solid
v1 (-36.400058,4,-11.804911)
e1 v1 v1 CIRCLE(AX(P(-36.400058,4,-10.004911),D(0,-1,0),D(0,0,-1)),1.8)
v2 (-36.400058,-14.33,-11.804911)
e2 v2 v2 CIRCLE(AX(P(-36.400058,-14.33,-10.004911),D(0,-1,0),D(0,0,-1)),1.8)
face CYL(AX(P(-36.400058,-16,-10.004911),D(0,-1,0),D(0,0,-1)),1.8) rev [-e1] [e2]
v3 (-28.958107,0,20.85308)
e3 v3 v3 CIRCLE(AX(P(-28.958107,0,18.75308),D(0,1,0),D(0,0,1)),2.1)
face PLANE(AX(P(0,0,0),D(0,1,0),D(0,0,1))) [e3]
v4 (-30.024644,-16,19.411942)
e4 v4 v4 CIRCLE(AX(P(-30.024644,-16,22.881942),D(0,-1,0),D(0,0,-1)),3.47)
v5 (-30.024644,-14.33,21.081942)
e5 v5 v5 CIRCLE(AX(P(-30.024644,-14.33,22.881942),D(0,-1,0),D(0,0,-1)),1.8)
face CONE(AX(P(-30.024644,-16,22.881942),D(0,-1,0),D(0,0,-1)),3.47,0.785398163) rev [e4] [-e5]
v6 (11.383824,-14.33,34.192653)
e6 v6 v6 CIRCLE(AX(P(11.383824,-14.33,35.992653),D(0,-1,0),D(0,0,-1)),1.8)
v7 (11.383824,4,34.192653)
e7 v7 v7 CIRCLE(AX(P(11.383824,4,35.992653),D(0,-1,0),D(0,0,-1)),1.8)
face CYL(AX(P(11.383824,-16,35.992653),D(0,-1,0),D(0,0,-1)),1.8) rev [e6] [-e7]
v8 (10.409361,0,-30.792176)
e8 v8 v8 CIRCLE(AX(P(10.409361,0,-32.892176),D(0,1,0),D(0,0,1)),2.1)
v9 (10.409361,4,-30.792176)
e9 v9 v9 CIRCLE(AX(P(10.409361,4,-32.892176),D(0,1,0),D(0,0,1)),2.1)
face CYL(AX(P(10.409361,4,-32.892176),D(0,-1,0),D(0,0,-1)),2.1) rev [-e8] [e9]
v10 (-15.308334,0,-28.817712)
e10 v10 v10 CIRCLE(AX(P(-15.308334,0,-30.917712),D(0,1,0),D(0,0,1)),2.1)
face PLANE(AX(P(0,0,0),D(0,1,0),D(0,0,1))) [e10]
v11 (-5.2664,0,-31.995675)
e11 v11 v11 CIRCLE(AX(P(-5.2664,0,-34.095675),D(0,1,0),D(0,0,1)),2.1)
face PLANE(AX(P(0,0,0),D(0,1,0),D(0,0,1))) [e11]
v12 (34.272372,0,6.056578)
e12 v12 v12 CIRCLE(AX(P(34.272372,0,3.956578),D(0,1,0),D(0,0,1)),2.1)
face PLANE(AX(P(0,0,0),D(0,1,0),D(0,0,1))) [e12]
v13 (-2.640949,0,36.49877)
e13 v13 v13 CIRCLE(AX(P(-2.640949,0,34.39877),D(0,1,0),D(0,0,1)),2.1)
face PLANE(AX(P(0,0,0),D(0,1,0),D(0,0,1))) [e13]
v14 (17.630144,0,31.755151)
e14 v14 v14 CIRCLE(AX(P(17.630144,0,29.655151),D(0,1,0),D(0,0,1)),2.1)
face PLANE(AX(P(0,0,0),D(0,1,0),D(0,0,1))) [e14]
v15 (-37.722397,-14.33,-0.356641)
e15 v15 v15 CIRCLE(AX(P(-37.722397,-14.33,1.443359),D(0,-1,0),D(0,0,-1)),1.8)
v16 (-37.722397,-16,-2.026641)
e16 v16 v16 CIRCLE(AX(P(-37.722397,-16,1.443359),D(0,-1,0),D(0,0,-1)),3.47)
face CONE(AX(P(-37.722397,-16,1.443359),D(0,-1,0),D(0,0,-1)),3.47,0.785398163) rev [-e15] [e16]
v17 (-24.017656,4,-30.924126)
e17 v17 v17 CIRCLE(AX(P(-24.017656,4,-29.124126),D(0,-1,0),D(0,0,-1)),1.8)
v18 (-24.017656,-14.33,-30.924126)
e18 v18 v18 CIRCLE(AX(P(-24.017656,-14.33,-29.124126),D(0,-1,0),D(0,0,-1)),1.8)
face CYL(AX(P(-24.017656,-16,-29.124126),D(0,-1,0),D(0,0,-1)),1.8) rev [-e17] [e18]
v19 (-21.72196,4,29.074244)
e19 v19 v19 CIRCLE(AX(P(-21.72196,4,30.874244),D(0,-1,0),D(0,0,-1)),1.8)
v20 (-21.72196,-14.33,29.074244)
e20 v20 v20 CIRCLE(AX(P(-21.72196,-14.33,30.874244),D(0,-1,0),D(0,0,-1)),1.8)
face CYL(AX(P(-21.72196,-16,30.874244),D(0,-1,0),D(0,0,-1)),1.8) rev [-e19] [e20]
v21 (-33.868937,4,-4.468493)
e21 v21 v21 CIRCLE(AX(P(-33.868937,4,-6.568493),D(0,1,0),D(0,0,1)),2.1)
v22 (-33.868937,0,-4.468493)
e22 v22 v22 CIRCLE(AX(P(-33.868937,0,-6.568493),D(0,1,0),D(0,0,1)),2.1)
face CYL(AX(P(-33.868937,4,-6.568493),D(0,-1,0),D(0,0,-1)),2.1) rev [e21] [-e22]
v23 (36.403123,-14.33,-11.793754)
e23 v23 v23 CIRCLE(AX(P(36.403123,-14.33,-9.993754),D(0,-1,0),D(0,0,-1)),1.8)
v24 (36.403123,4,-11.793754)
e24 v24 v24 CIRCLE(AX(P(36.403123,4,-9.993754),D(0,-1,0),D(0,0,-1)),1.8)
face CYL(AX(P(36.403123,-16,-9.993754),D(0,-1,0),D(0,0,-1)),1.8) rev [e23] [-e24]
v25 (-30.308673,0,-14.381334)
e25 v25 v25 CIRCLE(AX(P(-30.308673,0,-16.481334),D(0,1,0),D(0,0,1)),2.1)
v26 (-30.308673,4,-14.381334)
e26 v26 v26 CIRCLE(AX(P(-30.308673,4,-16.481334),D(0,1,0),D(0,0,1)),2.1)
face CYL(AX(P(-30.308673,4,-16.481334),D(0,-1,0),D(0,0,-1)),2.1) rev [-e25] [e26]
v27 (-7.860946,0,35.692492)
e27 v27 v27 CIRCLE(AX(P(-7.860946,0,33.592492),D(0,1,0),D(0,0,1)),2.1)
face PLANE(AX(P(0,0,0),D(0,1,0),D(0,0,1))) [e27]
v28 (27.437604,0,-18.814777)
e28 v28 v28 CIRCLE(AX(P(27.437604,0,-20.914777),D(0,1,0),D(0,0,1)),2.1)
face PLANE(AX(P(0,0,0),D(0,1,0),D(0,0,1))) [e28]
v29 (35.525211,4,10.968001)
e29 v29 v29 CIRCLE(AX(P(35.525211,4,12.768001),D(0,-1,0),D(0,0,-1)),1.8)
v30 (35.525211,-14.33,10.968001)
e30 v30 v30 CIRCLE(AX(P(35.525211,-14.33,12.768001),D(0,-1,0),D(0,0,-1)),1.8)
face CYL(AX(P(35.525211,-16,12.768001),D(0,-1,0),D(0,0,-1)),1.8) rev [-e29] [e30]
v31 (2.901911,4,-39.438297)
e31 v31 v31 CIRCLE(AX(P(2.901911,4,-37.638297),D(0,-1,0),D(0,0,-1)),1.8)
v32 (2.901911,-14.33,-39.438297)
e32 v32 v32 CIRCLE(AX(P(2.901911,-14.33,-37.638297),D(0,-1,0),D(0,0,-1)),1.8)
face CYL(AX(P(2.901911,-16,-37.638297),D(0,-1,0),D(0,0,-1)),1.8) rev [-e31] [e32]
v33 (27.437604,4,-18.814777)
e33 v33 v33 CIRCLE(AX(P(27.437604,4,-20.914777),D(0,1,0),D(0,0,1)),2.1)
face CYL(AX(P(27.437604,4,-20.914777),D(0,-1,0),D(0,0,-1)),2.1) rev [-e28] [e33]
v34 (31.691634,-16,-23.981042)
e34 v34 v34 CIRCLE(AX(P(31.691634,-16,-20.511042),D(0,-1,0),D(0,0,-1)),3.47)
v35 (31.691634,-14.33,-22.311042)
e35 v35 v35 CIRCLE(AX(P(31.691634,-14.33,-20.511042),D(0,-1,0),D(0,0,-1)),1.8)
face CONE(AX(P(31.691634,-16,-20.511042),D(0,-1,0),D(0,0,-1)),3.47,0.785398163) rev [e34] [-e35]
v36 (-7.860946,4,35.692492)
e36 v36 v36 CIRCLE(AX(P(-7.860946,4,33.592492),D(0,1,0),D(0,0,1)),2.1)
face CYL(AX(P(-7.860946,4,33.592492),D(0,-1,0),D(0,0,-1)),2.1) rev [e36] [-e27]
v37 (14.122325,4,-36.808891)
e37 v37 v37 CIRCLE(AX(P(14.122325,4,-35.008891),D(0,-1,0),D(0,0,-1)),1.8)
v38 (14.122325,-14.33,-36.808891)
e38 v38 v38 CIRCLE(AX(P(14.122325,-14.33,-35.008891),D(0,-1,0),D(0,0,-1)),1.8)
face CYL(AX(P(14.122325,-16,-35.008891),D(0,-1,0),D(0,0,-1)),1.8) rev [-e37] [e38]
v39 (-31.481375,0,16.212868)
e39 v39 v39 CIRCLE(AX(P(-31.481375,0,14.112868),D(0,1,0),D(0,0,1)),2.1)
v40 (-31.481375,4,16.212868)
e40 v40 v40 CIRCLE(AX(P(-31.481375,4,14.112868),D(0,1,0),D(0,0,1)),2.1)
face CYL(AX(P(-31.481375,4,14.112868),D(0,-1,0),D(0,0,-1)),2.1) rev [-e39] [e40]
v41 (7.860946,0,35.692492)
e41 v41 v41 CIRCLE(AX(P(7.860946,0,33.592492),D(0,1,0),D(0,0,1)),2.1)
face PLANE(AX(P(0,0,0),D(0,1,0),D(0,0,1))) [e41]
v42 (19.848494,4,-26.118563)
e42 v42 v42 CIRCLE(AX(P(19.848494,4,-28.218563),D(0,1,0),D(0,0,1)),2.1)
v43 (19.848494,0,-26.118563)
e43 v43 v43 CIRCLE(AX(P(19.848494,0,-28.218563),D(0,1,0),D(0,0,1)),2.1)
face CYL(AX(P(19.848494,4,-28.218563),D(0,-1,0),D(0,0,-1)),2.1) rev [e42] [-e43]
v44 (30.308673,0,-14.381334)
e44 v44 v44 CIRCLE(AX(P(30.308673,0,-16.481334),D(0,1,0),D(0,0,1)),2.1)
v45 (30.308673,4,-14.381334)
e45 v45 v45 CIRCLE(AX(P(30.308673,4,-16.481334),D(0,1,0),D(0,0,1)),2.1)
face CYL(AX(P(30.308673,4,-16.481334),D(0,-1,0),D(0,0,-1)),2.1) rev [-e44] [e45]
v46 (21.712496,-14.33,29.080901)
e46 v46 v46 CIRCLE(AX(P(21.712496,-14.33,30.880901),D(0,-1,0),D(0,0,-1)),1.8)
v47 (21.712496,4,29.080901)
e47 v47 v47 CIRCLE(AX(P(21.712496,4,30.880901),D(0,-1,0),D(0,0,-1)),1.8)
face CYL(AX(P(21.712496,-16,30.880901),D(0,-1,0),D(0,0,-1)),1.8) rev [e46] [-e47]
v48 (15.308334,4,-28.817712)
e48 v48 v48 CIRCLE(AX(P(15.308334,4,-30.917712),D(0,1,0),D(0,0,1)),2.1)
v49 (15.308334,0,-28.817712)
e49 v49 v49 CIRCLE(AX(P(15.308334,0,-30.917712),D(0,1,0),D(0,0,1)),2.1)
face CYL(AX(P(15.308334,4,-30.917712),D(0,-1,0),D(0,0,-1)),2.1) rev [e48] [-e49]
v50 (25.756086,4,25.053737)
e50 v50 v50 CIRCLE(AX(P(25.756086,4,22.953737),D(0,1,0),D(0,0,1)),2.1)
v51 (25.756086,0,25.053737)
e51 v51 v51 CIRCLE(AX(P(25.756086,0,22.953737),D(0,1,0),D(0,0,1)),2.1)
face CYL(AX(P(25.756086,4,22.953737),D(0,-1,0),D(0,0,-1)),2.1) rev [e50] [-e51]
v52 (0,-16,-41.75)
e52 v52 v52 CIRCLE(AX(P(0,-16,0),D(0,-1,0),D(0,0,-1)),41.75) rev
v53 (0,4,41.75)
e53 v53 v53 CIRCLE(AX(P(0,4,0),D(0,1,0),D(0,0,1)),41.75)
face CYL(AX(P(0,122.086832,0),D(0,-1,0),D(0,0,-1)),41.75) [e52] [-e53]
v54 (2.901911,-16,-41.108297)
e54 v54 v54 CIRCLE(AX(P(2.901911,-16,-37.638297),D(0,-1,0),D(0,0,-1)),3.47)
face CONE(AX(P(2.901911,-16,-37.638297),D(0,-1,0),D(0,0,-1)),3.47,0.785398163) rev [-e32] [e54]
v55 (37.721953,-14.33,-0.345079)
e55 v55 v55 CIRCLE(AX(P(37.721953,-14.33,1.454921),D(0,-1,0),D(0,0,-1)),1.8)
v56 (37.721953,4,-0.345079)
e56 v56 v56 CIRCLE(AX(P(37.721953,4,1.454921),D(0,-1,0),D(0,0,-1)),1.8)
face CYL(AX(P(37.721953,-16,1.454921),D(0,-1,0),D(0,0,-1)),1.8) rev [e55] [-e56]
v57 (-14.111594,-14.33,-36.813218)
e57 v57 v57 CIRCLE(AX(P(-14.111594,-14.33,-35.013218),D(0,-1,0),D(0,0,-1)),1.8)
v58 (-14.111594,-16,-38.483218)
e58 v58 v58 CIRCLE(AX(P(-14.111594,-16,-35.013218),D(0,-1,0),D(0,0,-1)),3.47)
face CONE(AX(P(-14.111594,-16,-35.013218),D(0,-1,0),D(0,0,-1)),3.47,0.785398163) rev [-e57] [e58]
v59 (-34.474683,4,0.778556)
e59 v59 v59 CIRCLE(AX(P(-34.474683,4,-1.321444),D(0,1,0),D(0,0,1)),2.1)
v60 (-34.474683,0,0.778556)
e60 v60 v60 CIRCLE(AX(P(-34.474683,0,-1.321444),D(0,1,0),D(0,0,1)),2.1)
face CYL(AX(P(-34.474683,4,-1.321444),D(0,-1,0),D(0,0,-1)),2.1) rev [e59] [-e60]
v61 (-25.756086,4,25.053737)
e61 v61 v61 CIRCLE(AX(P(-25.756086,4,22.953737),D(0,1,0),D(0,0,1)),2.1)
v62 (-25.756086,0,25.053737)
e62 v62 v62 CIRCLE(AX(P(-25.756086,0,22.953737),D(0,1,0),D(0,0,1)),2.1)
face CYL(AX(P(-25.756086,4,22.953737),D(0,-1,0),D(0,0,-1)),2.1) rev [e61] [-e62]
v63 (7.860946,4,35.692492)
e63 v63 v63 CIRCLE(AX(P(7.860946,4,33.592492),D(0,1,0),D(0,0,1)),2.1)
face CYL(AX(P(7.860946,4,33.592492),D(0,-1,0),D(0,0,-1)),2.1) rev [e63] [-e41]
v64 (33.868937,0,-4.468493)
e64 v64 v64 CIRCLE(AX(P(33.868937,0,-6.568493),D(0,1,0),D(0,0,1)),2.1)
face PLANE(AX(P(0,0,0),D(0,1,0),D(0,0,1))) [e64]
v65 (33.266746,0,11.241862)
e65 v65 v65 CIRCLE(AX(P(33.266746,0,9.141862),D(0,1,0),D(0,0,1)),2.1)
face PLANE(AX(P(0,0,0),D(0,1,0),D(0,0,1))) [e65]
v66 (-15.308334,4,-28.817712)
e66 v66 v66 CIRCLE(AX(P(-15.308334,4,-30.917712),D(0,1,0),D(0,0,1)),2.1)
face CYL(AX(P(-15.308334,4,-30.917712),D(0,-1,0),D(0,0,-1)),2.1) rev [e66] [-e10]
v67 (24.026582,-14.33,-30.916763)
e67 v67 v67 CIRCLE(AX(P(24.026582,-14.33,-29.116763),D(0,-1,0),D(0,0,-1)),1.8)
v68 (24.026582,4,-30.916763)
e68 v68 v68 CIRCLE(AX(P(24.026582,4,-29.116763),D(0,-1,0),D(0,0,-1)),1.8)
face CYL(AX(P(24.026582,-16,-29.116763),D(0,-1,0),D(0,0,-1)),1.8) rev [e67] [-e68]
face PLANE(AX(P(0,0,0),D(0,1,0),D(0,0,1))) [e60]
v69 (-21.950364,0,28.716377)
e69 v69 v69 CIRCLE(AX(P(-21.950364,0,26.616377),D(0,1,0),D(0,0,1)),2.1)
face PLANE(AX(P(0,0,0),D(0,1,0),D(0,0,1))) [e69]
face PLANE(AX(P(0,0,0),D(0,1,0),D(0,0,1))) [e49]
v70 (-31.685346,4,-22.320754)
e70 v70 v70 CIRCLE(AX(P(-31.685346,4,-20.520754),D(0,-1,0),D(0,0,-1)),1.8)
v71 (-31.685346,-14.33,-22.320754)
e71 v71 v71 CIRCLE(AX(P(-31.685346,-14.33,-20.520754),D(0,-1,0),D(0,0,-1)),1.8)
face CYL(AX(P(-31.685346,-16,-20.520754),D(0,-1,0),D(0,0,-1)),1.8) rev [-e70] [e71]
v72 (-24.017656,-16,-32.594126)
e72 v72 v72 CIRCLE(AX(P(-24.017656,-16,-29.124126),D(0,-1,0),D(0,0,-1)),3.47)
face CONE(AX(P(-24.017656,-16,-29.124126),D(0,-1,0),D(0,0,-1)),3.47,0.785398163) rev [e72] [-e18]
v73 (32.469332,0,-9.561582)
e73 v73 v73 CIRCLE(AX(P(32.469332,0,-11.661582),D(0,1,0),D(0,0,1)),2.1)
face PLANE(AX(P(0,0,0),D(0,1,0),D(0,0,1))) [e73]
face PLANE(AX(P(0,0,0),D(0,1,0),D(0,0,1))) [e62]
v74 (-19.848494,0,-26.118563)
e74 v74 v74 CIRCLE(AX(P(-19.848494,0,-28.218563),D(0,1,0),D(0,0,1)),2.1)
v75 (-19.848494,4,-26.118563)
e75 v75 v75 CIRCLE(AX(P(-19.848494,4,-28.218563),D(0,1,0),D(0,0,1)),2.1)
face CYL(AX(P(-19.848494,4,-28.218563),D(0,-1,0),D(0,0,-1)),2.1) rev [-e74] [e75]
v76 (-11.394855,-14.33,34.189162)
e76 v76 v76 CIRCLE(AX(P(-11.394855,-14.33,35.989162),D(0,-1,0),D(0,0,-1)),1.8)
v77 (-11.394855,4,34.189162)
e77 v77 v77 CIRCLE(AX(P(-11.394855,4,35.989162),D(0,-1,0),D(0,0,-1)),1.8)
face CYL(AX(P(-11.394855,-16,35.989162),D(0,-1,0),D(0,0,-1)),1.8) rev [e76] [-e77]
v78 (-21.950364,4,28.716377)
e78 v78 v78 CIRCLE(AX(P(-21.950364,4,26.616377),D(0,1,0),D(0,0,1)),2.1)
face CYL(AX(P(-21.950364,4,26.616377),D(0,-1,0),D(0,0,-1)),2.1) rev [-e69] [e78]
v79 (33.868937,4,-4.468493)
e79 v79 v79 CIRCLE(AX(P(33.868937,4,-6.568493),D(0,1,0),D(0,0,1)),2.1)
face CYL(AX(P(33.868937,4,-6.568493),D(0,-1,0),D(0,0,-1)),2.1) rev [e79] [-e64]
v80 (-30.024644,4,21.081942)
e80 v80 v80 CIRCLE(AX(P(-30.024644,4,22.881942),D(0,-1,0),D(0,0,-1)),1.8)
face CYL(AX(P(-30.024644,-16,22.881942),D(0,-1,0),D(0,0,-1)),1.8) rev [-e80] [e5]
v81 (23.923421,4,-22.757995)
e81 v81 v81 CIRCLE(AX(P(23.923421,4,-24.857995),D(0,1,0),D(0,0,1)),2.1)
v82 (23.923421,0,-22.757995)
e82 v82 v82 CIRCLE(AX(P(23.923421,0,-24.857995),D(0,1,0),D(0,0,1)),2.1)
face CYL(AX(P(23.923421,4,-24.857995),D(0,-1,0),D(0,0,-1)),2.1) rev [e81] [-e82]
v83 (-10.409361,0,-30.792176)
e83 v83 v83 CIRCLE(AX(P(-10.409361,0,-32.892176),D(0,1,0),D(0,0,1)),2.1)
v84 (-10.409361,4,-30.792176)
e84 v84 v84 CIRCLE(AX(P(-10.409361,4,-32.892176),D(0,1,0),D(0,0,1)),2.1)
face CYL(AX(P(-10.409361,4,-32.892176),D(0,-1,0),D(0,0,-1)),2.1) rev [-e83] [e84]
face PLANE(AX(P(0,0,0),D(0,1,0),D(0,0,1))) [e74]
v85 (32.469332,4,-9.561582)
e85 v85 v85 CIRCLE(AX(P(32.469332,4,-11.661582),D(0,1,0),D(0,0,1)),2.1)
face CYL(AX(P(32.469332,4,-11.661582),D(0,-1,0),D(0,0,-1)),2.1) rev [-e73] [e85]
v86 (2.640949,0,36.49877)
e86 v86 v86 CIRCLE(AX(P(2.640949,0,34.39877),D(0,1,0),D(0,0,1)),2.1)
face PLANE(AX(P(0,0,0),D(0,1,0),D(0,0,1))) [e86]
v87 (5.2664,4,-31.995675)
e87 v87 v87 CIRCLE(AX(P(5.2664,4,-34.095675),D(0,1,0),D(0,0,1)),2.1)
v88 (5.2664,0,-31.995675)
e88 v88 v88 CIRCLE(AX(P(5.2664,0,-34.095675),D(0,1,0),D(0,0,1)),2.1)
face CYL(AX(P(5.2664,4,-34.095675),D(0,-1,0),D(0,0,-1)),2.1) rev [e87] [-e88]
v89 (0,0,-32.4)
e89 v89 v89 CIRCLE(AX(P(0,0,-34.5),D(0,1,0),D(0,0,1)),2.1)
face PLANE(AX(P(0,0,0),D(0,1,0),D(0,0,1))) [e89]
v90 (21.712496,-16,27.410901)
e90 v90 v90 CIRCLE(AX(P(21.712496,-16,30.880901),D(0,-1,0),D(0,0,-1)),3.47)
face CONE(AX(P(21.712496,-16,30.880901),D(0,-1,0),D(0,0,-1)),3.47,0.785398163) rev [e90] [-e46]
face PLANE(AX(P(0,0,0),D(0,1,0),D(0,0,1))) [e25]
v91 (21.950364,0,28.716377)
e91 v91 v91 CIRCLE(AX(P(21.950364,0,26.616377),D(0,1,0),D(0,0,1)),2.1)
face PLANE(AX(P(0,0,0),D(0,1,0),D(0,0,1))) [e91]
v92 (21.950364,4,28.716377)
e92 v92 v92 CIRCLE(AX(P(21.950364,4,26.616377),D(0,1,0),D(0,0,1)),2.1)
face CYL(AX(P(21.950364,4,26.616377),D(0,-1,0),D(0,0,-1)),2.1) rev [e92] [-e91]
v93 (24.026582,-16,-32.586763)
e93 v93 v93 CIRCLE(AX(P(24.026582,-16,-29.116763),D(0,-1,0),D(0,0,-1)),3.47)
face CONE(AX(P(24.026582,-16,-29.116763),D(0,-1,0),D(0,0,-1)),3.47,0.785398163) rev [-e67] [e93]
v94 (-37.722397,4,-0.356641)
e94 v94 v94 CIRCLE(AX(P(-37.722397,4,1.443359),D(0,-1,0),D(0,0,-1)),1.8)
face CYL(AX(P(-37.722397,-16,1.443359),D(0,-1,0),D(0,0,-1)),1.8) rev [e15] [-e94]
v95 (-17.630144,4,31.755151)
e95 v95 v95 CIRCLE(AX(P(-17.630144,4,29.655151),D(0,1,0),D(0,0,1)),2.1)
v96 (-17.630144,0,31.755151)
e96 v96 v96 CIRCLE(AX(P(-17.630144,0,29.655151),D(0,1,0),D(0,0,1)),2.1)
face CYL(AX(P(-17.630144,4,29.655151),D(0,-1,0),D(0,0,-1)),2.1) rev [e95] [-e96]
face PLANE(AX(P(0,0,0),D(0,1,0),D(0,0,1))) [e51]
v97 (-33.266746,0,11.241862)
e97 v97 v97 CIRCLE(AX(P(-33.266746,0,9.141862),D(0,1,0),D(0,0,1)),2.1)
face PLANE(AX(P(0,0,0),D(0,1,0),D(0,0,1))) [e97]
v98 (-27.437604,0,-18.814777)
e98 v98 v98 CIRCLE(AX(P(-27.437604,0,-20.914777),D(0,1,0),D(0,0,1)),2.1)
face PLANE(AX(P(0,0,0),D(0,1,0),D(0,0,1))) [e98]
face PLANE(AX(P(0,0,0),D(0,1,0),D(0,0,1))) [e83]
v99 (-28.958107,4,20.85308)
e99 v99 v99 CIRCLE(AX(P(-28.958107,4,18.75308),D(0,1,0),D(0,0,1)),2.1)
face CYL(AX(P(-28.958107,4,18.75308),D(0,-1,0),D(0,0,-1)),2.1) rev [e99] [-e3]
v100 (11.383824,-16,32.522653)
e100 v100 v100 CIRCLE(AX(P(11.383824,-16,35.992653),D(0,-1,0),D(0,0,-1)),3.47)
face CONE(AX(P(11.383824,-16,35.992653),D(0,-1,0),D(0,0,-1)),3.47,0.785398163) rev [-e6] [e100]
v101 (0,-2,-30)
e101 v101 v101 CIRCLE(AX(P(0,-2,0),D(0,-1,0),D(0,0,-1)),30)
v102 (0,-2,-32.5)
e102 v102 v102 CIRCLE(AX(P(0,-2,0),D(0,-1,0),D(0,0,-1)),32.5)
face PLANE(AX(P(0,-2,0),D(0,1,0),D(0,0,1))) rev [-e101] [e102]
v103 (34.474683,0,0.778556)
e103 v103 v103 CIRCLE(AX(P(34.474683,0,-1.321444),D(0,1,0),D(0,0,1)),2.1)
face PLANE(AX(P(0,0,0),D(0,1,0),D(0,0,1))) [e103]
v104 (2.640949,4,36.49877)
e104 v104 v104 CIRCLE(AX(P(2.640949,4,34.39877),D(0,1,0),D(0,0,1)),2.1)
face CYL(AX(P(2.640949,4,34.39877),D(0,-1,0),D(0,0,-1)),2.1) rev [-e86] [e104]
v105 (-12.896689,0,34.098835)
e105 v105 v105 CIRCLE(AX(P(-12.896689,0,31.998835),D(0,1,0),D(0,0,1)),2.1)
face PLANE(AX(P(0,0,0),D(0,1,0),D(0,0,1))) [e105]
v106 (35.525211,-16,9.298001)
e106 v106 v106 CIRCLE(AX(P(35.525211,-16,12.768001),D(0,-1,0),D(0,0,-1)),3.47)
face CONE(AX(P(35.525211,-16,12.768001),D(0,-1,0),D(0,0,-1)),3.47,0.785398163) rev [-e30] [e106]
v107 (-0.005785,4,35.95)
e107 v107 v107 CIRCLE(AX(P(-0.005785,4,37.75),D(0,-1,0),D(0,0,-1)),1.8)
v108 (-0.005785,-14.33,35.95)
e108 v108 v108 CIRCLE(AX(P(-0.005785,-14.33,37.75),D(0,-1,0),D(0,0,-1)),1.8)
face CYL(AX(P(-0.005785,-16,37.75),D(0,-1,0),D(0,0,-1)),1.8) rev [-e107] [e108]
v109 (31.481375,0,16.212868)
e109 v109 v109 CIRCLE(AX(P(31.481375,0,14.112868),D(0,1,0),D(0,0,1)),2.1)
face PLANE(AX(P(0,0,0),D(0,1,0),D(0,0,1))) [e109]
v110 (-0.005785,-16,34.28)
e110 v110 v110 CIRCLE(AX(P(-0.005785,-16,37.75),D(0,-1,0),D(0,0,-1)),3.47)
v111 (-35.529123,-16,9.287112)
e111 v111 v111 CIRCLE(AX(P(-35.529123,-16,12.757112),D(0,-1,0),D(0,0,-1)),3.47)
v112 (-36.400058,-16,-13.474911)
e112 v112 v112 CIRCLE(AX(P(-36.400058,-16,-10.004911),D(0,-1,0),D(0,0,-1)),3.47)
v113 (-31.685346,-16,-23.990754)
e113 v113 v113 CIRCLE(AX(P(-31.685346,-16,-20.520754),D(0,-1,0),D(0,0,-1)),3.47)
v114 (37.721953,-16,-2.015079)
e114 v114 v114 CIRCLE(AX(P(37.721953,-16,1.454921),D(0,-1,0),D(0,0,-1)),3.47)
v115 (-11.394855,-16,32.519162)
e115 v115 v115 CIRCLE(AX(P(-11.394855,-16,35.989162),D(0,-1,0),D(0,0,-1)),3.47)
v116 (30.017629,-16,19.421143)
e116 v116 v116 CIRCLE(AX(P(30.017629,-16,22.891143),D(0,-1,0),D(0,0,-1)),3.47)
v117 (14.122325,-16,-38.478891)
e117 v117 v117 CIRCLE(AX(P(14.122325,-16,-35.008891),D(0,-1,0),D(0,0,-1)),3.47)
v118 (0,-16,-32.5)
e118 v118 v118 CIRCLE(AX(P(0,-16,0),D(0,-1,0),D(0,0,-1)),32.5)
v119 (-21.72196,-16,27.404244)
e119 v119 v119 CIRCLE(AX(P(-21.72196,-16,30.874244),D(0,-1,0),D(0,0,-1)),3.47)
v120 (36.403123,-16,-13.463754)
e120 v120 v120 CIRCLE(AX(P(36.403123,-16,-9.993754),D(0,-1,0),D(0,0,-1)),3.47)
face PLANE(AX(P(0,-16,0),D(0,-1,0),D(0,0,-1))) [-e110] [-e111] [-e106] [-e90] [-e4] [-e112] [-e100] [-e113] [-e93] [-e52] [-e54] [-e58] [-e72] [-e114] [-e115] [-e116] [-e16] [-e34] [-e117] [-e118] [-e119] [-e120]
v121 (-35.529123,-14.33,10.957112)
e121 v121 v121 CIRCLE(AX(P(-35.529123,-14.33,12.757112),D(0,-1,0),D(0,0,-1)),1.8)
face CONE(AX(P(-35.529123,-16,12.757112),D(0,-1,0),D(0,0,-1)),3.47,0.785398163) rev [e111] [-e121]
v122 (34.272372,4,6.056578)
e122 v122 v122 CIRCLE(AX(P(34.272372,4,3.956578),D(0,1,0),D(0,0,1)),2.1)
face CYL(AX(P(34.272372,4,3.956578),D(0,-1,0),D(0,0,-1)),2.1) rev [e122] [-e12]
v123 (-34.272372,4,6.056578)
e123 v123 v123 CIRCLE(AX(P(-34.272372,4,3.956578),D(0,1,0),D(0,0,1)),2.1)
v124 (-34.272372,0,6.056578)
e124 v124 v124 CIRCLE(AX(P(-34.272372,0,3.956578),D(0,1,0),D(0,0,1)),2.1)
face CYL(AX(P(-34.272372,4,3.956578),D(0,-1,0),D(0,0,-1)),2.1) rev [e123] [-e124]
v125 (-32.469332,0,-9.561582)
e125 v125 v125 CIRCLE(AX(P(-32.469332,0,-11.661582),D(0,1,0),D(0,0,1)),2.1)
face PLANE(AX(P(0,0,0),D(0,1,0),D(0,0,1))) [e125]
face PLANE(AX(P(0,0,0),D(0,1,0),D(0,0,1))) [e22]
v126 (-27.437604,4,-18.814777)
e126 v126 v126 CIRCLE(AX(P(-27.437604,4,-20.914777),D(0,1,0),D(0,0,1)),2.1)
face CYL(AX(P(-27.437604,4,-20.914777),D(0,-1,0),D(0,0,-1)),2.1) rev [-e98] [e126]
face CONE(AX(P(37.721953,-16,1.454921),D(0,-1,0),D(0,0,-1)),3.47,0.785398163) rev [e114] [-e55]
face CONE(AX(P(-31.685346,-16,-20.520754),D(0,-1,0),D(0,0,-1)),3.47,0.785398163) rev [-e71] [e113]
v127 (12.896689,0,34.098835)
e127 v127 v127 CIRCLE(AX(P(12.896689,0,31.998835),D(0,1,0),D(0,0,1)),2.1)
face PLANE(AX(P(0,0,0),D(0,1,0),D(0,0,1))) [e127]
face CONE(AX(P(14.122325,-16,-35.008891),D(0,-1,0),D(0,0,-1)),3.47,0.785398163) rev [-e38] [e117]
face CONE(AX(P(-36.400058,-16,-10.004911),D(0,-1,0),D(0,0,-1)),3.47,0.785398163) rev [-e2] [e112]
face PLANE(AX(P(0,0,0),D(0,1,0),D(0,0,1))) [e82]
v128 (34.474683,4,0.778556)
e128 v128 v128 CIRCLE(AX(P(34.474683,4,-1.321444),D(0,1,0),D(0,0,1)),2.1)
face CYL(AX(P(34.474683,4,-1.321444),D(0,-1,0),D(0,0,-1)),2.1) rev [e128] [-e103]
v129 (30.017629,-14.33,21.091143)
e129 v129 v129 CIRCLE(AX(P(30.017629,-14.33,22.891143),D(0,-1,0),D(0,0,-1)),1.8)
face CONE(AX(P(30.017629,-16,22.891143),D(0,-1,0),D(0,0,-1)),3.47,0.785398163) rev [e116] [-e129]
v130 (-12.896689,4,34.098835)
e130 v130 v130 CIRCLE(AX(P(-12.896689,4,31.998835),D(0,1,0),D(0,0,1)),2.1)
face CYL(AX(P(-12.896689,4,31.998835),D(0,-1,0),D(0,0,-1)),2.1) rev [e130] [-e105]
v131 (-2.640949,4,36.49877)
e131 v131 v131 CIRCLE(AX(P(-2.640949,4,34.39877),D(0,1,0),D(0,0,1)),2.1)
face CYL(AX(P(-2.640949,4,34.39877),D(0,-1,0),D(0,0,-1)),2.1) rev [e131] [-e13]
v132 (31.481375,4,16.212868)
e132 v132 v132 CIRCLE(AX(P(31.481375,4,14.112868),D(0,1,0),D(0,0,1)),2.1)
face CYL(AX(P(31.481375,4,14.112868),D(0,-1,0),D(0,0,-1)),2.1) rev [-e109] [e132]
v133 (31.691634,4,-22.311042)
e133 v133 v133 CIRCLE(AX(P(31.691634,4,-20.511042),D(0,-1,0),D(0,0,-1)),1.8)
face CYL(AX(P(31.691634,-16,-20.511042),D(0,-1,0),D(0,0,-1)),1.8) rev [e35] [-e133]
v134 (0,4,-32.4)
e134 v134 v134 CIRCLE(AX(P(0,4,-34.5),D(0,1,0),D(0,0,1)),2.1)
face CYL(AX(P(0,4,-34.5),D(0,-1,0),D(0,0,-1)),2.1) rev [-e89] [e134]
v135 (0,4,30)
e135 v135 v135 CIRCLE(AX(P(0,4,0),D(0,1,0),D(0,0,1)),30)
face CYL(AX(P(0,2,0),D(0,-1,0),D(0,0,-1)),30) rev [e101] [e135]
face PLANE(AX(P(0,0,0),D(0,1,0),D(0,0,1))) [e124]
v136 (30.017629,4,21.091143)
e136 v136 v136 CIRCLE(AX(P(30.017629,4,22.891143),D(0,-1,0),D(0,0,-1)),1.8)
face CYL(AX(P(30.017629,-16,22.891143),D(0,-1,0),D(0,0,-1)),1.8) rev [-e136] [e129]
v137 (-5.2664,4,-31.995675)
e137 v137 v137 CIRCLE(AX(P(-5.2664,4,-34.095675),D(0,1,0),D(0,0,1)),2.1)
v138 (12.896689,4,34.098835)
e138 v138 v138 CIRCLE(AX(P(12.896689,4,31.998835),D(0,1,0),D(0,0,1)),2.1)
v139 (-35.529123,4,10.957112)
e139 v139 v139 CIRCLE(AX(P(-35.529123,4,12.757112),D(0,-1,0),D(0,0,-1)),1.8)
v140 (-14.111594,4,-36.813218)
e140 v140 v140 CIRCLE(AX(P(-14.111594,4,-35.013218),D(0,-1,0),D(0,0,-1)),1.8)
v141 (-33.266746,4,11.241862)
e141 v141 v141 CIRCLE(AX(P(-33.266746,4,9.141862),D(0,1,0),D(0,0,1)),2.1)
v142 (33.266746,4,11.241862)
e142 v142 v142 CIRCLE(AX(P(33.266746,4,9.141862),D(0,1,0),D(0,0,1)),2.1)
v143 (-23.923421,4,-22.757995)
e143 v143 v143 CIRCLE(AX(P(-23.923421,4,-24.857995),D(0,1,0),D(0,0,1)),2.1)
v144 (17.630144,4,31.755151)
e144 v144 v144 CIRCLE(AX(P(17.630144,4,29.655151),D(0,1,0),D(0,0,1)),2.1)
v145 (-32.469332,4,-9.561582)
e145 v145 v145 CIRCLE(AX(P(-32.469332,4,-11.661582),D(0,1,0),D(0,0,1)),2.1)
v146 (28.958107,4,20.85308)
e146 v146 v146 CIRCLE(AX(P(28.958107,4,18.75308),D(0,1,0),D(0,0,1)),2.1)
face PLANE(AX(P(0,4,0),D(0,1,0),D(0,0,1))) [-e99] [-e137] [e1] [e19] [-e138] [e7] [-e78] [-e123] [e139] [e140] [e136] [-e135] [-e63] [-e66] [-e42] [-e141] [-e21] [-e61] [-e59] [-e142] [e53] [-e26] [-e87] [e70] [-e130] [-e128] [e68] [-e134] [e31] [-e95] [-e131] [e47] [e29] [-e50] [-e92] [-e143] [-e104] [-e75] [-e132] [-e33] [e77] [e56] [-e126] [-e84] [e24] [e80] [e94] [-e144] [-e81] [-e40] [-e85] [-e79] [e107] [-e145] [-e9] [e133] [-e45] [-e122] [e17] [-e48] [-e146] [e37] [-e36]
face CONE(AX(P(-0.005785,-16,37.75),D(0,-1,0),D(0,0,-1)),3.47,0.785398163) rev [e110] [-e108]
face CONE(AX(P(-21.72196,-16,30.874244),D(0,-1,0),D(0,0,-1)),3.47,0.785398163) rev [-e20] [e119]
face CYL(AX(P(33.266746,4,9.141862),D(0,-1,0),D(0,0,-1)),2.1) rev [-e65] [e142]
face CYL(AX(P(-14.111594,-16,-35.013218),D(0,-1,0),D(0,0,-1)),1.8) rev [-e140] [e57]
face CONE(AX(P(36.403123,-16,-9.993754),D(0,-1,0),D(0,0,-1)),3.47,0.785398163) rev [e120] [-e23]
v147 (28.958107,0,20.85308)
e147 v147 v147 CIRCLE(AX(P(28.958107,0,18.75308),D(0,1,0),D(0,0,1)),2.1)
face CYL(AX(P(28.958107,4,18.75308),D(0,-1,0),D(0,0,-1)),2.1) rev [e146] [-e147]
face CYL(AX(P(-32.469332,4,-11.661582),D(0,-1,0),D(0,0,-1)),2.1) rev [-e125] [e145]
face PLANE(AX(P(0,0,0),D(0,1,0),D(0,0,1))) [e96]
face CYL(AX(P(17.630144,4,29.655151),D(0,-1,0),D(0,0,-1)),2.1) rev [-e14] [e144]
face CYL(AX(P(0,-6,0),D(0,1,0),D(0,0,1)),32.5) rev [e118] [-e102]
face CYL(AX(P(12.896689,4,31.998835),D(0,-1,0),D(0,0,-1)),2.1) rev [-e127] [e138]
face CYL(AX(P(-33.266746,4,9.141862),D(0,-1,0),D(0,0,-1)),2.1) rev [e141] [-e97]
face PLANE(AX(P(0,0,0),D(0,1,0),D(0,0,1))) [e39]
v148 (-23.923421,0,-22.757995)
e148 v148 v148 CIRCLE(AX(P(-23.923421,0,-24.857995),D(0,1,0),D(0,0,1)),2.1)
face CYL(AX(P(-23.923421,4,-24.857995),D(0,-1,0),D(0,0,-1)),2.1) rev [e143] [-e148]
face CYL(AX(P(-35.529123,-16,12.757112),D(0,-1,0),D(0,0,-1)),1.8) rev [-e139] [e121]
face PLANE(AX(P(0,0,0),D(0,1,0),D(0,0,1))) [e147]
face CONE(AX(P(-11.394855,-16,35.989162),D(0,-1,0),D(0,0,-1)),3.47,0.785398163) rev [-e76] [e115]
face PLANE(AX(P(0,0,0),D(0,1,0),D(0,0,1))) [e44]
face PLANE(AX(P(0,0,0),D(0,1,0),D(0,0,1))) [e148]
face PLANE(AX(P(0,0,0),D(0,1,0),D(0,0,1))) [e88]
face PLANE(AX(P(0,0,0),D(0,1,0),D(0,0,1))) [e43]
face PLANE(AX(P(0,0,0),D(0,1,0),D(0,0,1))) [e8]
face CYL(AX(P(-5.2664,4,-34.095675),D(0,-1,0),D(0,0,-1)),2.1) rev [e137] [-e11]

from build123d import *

# Parameters (mm, degrees)
BOSS_EXTRUDE1_OUTLINE_R                              = 37
BOSS_EXTRUDE1_OUTLINE_R_2                            = 2.1
BOSS_EXTRUDE1_OUTLINE_R_3                            = 32
BOSS_EXTRUDE1_DEPTH                                  = 4
BOSS_EXTRUDE2_START                                  = -2
SKETCH2_R                                            = 37
SKETCH2_R_2                                          = 32
BOSS_EXTRUDE2_DEPTH                                  = 2
BOSS_EXTRUDE3_OUTLINE_W                              = 2
BOSS_EXTRUDE3_OUTLINE_H                              = 4
BOSS_EXTRUDE4_START                                  = 4
SKETCH4_R                                            = 37
SKETCH4_R_2                                          = 32.5
BOSS_EXTRUDE4_DEPTH                                  = 4
BOSS_EXTRUDE5_START                                  = 10
SKETCH5_R                                            = 40
SKETCH5_R_2                                          = 32.5
BOSS_EXTRUDE5_DEPTH                                  = 10
SKETCH6_R                                            = 40
SKETCH6_R_2                                          = 37
BOSS_EXTRUDE6_DEPTH                                  = 10
M3_CLEARANCE_HOLE1_D                                 = 3.4
SKETCH9_R                                            = 41.75
SKETCH9_R_2                                          = 40
BOSS_EXTRUDE7_DEPTH                                  = 20
CSK_FOR_M3_SOCKET_COUNTERSUNK_HEAD_SCREW_D           = 3.6
CSK_FOR_M3_SOCKET_COUNTERSUNK_HEAD_SCREW_CSINK_D     = 6.94
CSK_FOR_M3_SOCKET_COUNTERSUNK_HEAD_SCREW_CSINK_ANGLE = 90
SKETCH13_R                                           = 32
SKETCH13_R_2                                         = 30
BOSS_EXTRUDE8_DEPTH                                  = 2


# Read off the part's stored shape, not the designer's step: Boss-Extrude1, Boss-Extrude3
with BuildPart() as part:
    # Boss-Extrude1 outline → Boss-Extrude1 (new body)
    with BuildSketch(Plane(origin=(0, 0, 0), x_dir=(1, 0, 0), z_dir=(0, 1, 0))):
        Circle(BOSS_EXTRUDE1_OUTLINE_R)
        with Locations((-28.958107202, -18.753080475)):
            Circle(BOSS_EXTRUDE1_OUTLINE_R_2, mode=Mode.SUBTRACT)
        with Locations((-21.95036426, -26.616376704)):
            Circle(BOSS_EXTRUDE1_OUTLINE_R_2, mode=Mode.SUBTRACT)
        with Locations((-25.756086146, -22.953736656)):
            Circle(BOSS_EXTRUDE1_OUTLINE_R_2, mode=Mode.SUBTRACT)
        with Locations((-17.630144441, -29.655151441)):
            Circle(BOSS_EXTRUDE1_OUTLINE_R_2, mode=Mode.SUBTRACT)
        with Locations((-12.896688979, -31.998834563)):
            Circle(BOSS_EXTRUDE1_OUTLINE_R_2, mode=Mode.SUBTRACT)
        with Locations((-7.860946057, -33.592492124)):
            Circle(BOSS_EXTRUDE1_OUTLINE_R_2, mode=Mode.SUBTRACT)
        with Locations((-2.640949223, -34.398770141)):
            Circle(BOSS_EXTRUDE1_OUTLINE_R_2, mode=Mode.SUBTRACT)
        with Locations((-31.481374768, -14.112867982)):
            Circle(BOSS_EXTRUDE1_OUTLINE_R_2, mode=Mode.SUBTRACT)
        with Locations((-33.266745593, -9.141861826)):
            Circle(BOSS_EXTRUDE1_OUTLINE_R_2, mode=Mode.SUBTRACT)
        with Locations((-34.272372097, -3.956578176)):
            Circle(BOSS_EXTRUDE1_OUTLINE_R_2, mode=Mode.SUBTRACT)
        with Locations((2.640949223, -34.398770141)):
            Circle(BOSS_EXTRUDE1_OUTLINE_R_2, mode=Mode.SUBTRACT)
        with Locations((7.860946057, -33.592492124)):
            Circle(BOSS_EXTRUDE1_OUTLINE_R_2, mode=Mode.SUBTRACT)
        with Locations((12.896688979, -31.998834563)):
            Circle(BOSS_EXTRUDE1_OUTLINE_R_2, mode=Mode.SUBTRACT)
        with Locations((17.630144441, -29.655151441)):
            Circle(BOSS_EXTRUDE1_OUTLINE_R_2, mode=Mode.SUBTRACT)
        with Locations((21.95036426, -26.616376704)):
            Circle(BOSS_EXTRUDE1_OUTLINE_R_2, mode=Mode.SUBTRACT)
        with Locations((25.756086146, -22.953736656)):
            Circle(BOSS_EXTRUDE1_OUTLINE_R_2, mode=Mode.SUBTRACT)
        with Locations((28.958107202, -18.753080475)):
            Circle(BOSS_EXTRUDE1_OUTLINE_R_2, mode=Mode.SUBTRACT)
        with Locations((31.481374768, -14.112867982)):
            Circle(BOSS_EXTRUDE1_OUTLINE_R_2, mode=Mode.SUBTRACT)
        with Locations((33.266745593, -9.141861826)):
            Circle(BOSS_EXTRUDE1_OUTLINE_R_2, mode=Mode.SUBTRACT)
        with Locations((34.272372097, -3.956578176)):
            Circle(BOSS_EXTRUDE1_OUTLINE_R_2, mode=Mode.SUBTRACT)
        with Locations((-34.474683246, 1.321444312)):
            Circle(BOSS_EXTRUDE1_OUTLINE_R_2, mode=Mode.SUBTRACT)
        with Locations((-33.86893704, 6.568493266)):
            Circle(BOSS_EXTRUDE1_OUTLINE_R_2, mode=Mode.SUBTRACT)
        with Locations((-32.469331655, 11.661582305)):
            Circle(BOSS_EXTRUDE1_OUTLINE_R_2, mode=Mode.SUBTRACT)
        with Locations((-30.308672656, 16.481333739)):
            Circle(BOSS_EXTRUDE1_OUTLINE_R_2, mode=Mode.SUBTRACT)
        with Locations((-27.437604059, 20.914776678)):
            Circle(BOSS_EXTRUDE1_OUTLINE_R_2, mode=Mode.SUBTRACT)
        with Locations((-23.923421277, 24.857994979)):
            Circle(BOSS_EXTRUDE1_OUTLINE_R_2, mode=Mode.SUBTRACT)
        with Locations((-19.848493778, 28.218562946)):
            Circle(BOSS_EXTRUDE1_OUTLINE_R_2, mode=Mode.SUBTRACT)
        with Locations((-15.308334406, 30.917711715)):
            Circle(BOSS_EXTRUDE1_OUTLINE_R_2, mode=Mode.SUBTRACT)
        with Locations((-10.409360652, 32.892175526)):
            Circle(BOSS_EXTRUDE1_OUTLINE_R_2, mode=Mode.SUBTRACT)
        with Locations((-5.266400306, 34.09567462)):
            Circle(BOSS_EXTRUDE1_OUTLINE_R_2, mode=Mode.SUBTRACT)
        Circle(BOSS_EXTRUDE1_OUTLINE_R_3, mode=Mode.SUBTRACT)
        with Locations((34.474683246, 1.321444312)):
            Circle(BOSS_EXTRUDE1_OUTLINE_R_2, mode=Mode.SUBTRACT)
        with Locations((33.86893704, 6.568493266)):
            Circle(BOSS_EXTRUDE1_OUTLINE_R_2, mode=Mode.SUBTRACT)
        with Locations((32.469331655, 11.661582305)):
            Circle(BOSS_EXTRUDE1_OUTLINE_R_2, mode=Mode.SUBTRACT)
        with Locations((30.308672656, 16.481333739)):
            Circle(BOSS_EXTRUDE1_OUTLINE_R_2, mode=Mode.SUBTRACT)
        with Locations((0, 34.5)):
            Circle(BOSS_EXTRUDE1_OUTLINE_R_2, mode=Mode.SUBTRACT)
        with Locations((5.266400306, 34.09567462)):
            Circle(BOSS_EXTRUDE1_OUTLINE_R_2, mode=Mode.SUBTRACT)
        with Locations((15.308334406, 30.917711715)):
            Circle(BOSS_EXTRUDE1_OUTLINE_R_2, mode=Mode.SUBTRACT)
        with Locations((10.409360652, 32.892175526)):
            Circle(BOSS_EXTRUDE1_OUTLINE_R_2, mode=Mode.SUBTRACT)
        with Locations((27.437604059, 20.914776678)):
            Circle(BOSS_EXTRUDE1_OUTLINE_R_2, mode=Mode.SUBTRACT)
        with Locations((23.923421277, 24.857994979)):
            Circle(BOSS_EXTRUDE1_OUTLINE_R_2, mode=Mode.SUBTRACT)
        with Locations((19.848493778, 28.218562946)):
            Circle(BOSS_EXTRUDE1_OUTLINE_R_2, mode=Mode.SUBTRACT)
    extrude(amount=BOSS_EXTRUDE1_DEPTH)

    # Sketch2 → Boss-Extrude2 (add)
    with BuildSketch(Plane(origin=(0, 0, 0), x_dir=(1, 0, 0), z_dir=(0, 1, 0)).offset(BOSS_EXTRUDE2_START)):
        with Locations(Location((0, 0, 0), (0, 0, 270))):
            Circle(SKETCH2_R)
        with Locations(Location((0, 0, 0), (0, 0, 270))):
            Circle(SKETCH2_R_2, mode=Mode.SUBTRACT)
    extrude(amount=BOSS_EXTRUDE2_DEPTH)

    # Boss-Extrude3 outline → Boss-Extrude3 (revolve)
    with BuildSketch(Plane.XY):
        with Locations((31, 0)):
            Rectangle(BOSS_EXTRUDE3_OUTLINE_W, BOSS_EXTRUDE3_OUTLINE_H)
    revolve(axis=Axis((0, 0, 0), (0, 1, 0)))

    # Sketch4 → Boss-Extrude4 (add)
    with BuildSketch(Plane.XZ.offset(2).offset(BOSS_EXTRUDE4_START)):
        with Locations(Location((0, 0, 0), (0, 0, 270))):
            Circle(SKETCH4_R)
        with Locations(Location((0, 0, 0), (0, 0, 270))):
            Circle(SKETCH4_R_2, mode=Mode.SUBTRACT)
    extrude(amount=-BOSS_EXTRUDE4_DEPTH)

    # Sketch5 → Boss-Extrude5 (add)
    with BuildSketch(Plane.XZ.offset(6).offset(BOSS_EXTRUDE5_START)):
        with Locations(Location((0, 0, 0), (0, 0, 270))):
            Circle(SKETCH5_R)
        with Locations(Location((0, 0, 0), (0, 0, 270))):
            Circle(SKETCH5_R_2, mode=Mode.SUBTRACT)
    extrude(amount=-BOSS_EXTRUDE5_DEPTH)

    # Sketch6 → Boss-Extrude6 (add)
    with BuildSketch(Plane(origin=(0, -6, 0), x_dir=(1, 0, 0), z_dir=(0, 1, 0))):
        with Locations(Location((0, 0, 0), (0, 0, 270))):
            Circle(SKETCH6_R)
        Circle(SKETCH6_R_2, mode=Mode.SUBTRACT)
    extrude(amount=BOSS_EXTRUDE6_DEPTH)

    # M3 Clearance Hole1 (through all)
    with Locations(Plane(origin=(0, 4, 0), x_dir=(1, 0, 0), z_dir=(0, 1, 0))):
        with Locations((-14.111594462, 35.013217529), (2.889734295, 37.639233995), (14.111594462, 35.013217529), (24.018152198, 29.123716538), (31.686044836, 20.519675013), (36.400569453, 10.003051708), (37.722298335, -1.445928197), (35.528036811, -12.76013716), (30.022305891, -22.885009264), (21.718279423, -30.876833369), (11.389952597, -35.9907138), (0, -37.75), (-11.389952597, -35.9907138), (-21.718279423, -30.876833369), (-30.022305891, -22.885009264), (-35.528036811, -12.76013716), (-37.722298335, -1.445928197), (-36.400569453, 10.003051708), (-31.686044836, 20.519675013), (-24.018152198, 29.123716538)):
            Hole(M3_CLEARANCE_HOLE1_D / 2)

    # Sketch9 → Boss-Extrude7 (add)
    with BuildSketch(Plane(origin=(0, -16, 0), x_dir=(1, 0, 0), z_dir=(0, 1, 0))):
        with Locations(Location((0, 0, 0), (0, 0, 90))):
            Circle(SKETCH9_R)
        Circle(SKETCH9_R_2, mode=Mode.SUBTRACT)
    extrude(amount=BOSS_EXTRUDE7_DEPTH)

    # CSK for M3 socket countersunk head screw1 (through all)
    with Locations(Plane(origin=(0, -16, 0), x_dir=(-1, 0, 0), z_dir=(0, -1, 0))):
        with Locations((14.111594462, 35.013217529), (24.017656287, 29.124125506), (31.685346016, 20.520754075), (36.400058422, 10.004911138), (37.72239673, -1.443358912), (35.529123055, -12.757112327), (30.024643795, -22.881941897), (21.721959578, -30.874244478), (11.394855176, -35.989161917), (0.005785128, -37.749999557), (-11.383824076, -35.992652714), (-21.712495699, -30.88090074), (-30.017629142, -22.891143281), (-35.525211372, -12.768001292), (-37.721952573, -1.45492064), (-36.403123186, 9.993754165), (-31.691634074, 20.511041653), (-24.026581612, 29.116762802), (-14.12232524, 35.008890725), (-2.901911355, 37.638297125)):
            CounterSinkHole(CSK_FOR_M3_SOCKET_COUNTERSUNK_HEAD_SCREW_D / 2, CSK_FOR_M3_SOCKET_COUNTERSUNK_HEAD_SCREW_CSINK_D / 2, counter_sink_angle=CSK_FOR_M3_SOCKET_COUNTERSUNK_HEAD_SCREW_CSINK_ANGLE)

    # Sketch13 → Boss-Extrude8 (add)
    with BuildSketch(Plane(origin=(0, 2, 0), x_dir=(1, 0, 0), z_dir=(0, 1, 0))):
        Circle(SKETCH13_R)
        with Locations(Location((0, 0, 0), (0, 0, 90))):
            Circle(SKETCH13_R_2, mode=Mode.SUBTRACT)
    extrude(amount=BOSS_EXTRUDE8_DEPTH)


solid = part.part
